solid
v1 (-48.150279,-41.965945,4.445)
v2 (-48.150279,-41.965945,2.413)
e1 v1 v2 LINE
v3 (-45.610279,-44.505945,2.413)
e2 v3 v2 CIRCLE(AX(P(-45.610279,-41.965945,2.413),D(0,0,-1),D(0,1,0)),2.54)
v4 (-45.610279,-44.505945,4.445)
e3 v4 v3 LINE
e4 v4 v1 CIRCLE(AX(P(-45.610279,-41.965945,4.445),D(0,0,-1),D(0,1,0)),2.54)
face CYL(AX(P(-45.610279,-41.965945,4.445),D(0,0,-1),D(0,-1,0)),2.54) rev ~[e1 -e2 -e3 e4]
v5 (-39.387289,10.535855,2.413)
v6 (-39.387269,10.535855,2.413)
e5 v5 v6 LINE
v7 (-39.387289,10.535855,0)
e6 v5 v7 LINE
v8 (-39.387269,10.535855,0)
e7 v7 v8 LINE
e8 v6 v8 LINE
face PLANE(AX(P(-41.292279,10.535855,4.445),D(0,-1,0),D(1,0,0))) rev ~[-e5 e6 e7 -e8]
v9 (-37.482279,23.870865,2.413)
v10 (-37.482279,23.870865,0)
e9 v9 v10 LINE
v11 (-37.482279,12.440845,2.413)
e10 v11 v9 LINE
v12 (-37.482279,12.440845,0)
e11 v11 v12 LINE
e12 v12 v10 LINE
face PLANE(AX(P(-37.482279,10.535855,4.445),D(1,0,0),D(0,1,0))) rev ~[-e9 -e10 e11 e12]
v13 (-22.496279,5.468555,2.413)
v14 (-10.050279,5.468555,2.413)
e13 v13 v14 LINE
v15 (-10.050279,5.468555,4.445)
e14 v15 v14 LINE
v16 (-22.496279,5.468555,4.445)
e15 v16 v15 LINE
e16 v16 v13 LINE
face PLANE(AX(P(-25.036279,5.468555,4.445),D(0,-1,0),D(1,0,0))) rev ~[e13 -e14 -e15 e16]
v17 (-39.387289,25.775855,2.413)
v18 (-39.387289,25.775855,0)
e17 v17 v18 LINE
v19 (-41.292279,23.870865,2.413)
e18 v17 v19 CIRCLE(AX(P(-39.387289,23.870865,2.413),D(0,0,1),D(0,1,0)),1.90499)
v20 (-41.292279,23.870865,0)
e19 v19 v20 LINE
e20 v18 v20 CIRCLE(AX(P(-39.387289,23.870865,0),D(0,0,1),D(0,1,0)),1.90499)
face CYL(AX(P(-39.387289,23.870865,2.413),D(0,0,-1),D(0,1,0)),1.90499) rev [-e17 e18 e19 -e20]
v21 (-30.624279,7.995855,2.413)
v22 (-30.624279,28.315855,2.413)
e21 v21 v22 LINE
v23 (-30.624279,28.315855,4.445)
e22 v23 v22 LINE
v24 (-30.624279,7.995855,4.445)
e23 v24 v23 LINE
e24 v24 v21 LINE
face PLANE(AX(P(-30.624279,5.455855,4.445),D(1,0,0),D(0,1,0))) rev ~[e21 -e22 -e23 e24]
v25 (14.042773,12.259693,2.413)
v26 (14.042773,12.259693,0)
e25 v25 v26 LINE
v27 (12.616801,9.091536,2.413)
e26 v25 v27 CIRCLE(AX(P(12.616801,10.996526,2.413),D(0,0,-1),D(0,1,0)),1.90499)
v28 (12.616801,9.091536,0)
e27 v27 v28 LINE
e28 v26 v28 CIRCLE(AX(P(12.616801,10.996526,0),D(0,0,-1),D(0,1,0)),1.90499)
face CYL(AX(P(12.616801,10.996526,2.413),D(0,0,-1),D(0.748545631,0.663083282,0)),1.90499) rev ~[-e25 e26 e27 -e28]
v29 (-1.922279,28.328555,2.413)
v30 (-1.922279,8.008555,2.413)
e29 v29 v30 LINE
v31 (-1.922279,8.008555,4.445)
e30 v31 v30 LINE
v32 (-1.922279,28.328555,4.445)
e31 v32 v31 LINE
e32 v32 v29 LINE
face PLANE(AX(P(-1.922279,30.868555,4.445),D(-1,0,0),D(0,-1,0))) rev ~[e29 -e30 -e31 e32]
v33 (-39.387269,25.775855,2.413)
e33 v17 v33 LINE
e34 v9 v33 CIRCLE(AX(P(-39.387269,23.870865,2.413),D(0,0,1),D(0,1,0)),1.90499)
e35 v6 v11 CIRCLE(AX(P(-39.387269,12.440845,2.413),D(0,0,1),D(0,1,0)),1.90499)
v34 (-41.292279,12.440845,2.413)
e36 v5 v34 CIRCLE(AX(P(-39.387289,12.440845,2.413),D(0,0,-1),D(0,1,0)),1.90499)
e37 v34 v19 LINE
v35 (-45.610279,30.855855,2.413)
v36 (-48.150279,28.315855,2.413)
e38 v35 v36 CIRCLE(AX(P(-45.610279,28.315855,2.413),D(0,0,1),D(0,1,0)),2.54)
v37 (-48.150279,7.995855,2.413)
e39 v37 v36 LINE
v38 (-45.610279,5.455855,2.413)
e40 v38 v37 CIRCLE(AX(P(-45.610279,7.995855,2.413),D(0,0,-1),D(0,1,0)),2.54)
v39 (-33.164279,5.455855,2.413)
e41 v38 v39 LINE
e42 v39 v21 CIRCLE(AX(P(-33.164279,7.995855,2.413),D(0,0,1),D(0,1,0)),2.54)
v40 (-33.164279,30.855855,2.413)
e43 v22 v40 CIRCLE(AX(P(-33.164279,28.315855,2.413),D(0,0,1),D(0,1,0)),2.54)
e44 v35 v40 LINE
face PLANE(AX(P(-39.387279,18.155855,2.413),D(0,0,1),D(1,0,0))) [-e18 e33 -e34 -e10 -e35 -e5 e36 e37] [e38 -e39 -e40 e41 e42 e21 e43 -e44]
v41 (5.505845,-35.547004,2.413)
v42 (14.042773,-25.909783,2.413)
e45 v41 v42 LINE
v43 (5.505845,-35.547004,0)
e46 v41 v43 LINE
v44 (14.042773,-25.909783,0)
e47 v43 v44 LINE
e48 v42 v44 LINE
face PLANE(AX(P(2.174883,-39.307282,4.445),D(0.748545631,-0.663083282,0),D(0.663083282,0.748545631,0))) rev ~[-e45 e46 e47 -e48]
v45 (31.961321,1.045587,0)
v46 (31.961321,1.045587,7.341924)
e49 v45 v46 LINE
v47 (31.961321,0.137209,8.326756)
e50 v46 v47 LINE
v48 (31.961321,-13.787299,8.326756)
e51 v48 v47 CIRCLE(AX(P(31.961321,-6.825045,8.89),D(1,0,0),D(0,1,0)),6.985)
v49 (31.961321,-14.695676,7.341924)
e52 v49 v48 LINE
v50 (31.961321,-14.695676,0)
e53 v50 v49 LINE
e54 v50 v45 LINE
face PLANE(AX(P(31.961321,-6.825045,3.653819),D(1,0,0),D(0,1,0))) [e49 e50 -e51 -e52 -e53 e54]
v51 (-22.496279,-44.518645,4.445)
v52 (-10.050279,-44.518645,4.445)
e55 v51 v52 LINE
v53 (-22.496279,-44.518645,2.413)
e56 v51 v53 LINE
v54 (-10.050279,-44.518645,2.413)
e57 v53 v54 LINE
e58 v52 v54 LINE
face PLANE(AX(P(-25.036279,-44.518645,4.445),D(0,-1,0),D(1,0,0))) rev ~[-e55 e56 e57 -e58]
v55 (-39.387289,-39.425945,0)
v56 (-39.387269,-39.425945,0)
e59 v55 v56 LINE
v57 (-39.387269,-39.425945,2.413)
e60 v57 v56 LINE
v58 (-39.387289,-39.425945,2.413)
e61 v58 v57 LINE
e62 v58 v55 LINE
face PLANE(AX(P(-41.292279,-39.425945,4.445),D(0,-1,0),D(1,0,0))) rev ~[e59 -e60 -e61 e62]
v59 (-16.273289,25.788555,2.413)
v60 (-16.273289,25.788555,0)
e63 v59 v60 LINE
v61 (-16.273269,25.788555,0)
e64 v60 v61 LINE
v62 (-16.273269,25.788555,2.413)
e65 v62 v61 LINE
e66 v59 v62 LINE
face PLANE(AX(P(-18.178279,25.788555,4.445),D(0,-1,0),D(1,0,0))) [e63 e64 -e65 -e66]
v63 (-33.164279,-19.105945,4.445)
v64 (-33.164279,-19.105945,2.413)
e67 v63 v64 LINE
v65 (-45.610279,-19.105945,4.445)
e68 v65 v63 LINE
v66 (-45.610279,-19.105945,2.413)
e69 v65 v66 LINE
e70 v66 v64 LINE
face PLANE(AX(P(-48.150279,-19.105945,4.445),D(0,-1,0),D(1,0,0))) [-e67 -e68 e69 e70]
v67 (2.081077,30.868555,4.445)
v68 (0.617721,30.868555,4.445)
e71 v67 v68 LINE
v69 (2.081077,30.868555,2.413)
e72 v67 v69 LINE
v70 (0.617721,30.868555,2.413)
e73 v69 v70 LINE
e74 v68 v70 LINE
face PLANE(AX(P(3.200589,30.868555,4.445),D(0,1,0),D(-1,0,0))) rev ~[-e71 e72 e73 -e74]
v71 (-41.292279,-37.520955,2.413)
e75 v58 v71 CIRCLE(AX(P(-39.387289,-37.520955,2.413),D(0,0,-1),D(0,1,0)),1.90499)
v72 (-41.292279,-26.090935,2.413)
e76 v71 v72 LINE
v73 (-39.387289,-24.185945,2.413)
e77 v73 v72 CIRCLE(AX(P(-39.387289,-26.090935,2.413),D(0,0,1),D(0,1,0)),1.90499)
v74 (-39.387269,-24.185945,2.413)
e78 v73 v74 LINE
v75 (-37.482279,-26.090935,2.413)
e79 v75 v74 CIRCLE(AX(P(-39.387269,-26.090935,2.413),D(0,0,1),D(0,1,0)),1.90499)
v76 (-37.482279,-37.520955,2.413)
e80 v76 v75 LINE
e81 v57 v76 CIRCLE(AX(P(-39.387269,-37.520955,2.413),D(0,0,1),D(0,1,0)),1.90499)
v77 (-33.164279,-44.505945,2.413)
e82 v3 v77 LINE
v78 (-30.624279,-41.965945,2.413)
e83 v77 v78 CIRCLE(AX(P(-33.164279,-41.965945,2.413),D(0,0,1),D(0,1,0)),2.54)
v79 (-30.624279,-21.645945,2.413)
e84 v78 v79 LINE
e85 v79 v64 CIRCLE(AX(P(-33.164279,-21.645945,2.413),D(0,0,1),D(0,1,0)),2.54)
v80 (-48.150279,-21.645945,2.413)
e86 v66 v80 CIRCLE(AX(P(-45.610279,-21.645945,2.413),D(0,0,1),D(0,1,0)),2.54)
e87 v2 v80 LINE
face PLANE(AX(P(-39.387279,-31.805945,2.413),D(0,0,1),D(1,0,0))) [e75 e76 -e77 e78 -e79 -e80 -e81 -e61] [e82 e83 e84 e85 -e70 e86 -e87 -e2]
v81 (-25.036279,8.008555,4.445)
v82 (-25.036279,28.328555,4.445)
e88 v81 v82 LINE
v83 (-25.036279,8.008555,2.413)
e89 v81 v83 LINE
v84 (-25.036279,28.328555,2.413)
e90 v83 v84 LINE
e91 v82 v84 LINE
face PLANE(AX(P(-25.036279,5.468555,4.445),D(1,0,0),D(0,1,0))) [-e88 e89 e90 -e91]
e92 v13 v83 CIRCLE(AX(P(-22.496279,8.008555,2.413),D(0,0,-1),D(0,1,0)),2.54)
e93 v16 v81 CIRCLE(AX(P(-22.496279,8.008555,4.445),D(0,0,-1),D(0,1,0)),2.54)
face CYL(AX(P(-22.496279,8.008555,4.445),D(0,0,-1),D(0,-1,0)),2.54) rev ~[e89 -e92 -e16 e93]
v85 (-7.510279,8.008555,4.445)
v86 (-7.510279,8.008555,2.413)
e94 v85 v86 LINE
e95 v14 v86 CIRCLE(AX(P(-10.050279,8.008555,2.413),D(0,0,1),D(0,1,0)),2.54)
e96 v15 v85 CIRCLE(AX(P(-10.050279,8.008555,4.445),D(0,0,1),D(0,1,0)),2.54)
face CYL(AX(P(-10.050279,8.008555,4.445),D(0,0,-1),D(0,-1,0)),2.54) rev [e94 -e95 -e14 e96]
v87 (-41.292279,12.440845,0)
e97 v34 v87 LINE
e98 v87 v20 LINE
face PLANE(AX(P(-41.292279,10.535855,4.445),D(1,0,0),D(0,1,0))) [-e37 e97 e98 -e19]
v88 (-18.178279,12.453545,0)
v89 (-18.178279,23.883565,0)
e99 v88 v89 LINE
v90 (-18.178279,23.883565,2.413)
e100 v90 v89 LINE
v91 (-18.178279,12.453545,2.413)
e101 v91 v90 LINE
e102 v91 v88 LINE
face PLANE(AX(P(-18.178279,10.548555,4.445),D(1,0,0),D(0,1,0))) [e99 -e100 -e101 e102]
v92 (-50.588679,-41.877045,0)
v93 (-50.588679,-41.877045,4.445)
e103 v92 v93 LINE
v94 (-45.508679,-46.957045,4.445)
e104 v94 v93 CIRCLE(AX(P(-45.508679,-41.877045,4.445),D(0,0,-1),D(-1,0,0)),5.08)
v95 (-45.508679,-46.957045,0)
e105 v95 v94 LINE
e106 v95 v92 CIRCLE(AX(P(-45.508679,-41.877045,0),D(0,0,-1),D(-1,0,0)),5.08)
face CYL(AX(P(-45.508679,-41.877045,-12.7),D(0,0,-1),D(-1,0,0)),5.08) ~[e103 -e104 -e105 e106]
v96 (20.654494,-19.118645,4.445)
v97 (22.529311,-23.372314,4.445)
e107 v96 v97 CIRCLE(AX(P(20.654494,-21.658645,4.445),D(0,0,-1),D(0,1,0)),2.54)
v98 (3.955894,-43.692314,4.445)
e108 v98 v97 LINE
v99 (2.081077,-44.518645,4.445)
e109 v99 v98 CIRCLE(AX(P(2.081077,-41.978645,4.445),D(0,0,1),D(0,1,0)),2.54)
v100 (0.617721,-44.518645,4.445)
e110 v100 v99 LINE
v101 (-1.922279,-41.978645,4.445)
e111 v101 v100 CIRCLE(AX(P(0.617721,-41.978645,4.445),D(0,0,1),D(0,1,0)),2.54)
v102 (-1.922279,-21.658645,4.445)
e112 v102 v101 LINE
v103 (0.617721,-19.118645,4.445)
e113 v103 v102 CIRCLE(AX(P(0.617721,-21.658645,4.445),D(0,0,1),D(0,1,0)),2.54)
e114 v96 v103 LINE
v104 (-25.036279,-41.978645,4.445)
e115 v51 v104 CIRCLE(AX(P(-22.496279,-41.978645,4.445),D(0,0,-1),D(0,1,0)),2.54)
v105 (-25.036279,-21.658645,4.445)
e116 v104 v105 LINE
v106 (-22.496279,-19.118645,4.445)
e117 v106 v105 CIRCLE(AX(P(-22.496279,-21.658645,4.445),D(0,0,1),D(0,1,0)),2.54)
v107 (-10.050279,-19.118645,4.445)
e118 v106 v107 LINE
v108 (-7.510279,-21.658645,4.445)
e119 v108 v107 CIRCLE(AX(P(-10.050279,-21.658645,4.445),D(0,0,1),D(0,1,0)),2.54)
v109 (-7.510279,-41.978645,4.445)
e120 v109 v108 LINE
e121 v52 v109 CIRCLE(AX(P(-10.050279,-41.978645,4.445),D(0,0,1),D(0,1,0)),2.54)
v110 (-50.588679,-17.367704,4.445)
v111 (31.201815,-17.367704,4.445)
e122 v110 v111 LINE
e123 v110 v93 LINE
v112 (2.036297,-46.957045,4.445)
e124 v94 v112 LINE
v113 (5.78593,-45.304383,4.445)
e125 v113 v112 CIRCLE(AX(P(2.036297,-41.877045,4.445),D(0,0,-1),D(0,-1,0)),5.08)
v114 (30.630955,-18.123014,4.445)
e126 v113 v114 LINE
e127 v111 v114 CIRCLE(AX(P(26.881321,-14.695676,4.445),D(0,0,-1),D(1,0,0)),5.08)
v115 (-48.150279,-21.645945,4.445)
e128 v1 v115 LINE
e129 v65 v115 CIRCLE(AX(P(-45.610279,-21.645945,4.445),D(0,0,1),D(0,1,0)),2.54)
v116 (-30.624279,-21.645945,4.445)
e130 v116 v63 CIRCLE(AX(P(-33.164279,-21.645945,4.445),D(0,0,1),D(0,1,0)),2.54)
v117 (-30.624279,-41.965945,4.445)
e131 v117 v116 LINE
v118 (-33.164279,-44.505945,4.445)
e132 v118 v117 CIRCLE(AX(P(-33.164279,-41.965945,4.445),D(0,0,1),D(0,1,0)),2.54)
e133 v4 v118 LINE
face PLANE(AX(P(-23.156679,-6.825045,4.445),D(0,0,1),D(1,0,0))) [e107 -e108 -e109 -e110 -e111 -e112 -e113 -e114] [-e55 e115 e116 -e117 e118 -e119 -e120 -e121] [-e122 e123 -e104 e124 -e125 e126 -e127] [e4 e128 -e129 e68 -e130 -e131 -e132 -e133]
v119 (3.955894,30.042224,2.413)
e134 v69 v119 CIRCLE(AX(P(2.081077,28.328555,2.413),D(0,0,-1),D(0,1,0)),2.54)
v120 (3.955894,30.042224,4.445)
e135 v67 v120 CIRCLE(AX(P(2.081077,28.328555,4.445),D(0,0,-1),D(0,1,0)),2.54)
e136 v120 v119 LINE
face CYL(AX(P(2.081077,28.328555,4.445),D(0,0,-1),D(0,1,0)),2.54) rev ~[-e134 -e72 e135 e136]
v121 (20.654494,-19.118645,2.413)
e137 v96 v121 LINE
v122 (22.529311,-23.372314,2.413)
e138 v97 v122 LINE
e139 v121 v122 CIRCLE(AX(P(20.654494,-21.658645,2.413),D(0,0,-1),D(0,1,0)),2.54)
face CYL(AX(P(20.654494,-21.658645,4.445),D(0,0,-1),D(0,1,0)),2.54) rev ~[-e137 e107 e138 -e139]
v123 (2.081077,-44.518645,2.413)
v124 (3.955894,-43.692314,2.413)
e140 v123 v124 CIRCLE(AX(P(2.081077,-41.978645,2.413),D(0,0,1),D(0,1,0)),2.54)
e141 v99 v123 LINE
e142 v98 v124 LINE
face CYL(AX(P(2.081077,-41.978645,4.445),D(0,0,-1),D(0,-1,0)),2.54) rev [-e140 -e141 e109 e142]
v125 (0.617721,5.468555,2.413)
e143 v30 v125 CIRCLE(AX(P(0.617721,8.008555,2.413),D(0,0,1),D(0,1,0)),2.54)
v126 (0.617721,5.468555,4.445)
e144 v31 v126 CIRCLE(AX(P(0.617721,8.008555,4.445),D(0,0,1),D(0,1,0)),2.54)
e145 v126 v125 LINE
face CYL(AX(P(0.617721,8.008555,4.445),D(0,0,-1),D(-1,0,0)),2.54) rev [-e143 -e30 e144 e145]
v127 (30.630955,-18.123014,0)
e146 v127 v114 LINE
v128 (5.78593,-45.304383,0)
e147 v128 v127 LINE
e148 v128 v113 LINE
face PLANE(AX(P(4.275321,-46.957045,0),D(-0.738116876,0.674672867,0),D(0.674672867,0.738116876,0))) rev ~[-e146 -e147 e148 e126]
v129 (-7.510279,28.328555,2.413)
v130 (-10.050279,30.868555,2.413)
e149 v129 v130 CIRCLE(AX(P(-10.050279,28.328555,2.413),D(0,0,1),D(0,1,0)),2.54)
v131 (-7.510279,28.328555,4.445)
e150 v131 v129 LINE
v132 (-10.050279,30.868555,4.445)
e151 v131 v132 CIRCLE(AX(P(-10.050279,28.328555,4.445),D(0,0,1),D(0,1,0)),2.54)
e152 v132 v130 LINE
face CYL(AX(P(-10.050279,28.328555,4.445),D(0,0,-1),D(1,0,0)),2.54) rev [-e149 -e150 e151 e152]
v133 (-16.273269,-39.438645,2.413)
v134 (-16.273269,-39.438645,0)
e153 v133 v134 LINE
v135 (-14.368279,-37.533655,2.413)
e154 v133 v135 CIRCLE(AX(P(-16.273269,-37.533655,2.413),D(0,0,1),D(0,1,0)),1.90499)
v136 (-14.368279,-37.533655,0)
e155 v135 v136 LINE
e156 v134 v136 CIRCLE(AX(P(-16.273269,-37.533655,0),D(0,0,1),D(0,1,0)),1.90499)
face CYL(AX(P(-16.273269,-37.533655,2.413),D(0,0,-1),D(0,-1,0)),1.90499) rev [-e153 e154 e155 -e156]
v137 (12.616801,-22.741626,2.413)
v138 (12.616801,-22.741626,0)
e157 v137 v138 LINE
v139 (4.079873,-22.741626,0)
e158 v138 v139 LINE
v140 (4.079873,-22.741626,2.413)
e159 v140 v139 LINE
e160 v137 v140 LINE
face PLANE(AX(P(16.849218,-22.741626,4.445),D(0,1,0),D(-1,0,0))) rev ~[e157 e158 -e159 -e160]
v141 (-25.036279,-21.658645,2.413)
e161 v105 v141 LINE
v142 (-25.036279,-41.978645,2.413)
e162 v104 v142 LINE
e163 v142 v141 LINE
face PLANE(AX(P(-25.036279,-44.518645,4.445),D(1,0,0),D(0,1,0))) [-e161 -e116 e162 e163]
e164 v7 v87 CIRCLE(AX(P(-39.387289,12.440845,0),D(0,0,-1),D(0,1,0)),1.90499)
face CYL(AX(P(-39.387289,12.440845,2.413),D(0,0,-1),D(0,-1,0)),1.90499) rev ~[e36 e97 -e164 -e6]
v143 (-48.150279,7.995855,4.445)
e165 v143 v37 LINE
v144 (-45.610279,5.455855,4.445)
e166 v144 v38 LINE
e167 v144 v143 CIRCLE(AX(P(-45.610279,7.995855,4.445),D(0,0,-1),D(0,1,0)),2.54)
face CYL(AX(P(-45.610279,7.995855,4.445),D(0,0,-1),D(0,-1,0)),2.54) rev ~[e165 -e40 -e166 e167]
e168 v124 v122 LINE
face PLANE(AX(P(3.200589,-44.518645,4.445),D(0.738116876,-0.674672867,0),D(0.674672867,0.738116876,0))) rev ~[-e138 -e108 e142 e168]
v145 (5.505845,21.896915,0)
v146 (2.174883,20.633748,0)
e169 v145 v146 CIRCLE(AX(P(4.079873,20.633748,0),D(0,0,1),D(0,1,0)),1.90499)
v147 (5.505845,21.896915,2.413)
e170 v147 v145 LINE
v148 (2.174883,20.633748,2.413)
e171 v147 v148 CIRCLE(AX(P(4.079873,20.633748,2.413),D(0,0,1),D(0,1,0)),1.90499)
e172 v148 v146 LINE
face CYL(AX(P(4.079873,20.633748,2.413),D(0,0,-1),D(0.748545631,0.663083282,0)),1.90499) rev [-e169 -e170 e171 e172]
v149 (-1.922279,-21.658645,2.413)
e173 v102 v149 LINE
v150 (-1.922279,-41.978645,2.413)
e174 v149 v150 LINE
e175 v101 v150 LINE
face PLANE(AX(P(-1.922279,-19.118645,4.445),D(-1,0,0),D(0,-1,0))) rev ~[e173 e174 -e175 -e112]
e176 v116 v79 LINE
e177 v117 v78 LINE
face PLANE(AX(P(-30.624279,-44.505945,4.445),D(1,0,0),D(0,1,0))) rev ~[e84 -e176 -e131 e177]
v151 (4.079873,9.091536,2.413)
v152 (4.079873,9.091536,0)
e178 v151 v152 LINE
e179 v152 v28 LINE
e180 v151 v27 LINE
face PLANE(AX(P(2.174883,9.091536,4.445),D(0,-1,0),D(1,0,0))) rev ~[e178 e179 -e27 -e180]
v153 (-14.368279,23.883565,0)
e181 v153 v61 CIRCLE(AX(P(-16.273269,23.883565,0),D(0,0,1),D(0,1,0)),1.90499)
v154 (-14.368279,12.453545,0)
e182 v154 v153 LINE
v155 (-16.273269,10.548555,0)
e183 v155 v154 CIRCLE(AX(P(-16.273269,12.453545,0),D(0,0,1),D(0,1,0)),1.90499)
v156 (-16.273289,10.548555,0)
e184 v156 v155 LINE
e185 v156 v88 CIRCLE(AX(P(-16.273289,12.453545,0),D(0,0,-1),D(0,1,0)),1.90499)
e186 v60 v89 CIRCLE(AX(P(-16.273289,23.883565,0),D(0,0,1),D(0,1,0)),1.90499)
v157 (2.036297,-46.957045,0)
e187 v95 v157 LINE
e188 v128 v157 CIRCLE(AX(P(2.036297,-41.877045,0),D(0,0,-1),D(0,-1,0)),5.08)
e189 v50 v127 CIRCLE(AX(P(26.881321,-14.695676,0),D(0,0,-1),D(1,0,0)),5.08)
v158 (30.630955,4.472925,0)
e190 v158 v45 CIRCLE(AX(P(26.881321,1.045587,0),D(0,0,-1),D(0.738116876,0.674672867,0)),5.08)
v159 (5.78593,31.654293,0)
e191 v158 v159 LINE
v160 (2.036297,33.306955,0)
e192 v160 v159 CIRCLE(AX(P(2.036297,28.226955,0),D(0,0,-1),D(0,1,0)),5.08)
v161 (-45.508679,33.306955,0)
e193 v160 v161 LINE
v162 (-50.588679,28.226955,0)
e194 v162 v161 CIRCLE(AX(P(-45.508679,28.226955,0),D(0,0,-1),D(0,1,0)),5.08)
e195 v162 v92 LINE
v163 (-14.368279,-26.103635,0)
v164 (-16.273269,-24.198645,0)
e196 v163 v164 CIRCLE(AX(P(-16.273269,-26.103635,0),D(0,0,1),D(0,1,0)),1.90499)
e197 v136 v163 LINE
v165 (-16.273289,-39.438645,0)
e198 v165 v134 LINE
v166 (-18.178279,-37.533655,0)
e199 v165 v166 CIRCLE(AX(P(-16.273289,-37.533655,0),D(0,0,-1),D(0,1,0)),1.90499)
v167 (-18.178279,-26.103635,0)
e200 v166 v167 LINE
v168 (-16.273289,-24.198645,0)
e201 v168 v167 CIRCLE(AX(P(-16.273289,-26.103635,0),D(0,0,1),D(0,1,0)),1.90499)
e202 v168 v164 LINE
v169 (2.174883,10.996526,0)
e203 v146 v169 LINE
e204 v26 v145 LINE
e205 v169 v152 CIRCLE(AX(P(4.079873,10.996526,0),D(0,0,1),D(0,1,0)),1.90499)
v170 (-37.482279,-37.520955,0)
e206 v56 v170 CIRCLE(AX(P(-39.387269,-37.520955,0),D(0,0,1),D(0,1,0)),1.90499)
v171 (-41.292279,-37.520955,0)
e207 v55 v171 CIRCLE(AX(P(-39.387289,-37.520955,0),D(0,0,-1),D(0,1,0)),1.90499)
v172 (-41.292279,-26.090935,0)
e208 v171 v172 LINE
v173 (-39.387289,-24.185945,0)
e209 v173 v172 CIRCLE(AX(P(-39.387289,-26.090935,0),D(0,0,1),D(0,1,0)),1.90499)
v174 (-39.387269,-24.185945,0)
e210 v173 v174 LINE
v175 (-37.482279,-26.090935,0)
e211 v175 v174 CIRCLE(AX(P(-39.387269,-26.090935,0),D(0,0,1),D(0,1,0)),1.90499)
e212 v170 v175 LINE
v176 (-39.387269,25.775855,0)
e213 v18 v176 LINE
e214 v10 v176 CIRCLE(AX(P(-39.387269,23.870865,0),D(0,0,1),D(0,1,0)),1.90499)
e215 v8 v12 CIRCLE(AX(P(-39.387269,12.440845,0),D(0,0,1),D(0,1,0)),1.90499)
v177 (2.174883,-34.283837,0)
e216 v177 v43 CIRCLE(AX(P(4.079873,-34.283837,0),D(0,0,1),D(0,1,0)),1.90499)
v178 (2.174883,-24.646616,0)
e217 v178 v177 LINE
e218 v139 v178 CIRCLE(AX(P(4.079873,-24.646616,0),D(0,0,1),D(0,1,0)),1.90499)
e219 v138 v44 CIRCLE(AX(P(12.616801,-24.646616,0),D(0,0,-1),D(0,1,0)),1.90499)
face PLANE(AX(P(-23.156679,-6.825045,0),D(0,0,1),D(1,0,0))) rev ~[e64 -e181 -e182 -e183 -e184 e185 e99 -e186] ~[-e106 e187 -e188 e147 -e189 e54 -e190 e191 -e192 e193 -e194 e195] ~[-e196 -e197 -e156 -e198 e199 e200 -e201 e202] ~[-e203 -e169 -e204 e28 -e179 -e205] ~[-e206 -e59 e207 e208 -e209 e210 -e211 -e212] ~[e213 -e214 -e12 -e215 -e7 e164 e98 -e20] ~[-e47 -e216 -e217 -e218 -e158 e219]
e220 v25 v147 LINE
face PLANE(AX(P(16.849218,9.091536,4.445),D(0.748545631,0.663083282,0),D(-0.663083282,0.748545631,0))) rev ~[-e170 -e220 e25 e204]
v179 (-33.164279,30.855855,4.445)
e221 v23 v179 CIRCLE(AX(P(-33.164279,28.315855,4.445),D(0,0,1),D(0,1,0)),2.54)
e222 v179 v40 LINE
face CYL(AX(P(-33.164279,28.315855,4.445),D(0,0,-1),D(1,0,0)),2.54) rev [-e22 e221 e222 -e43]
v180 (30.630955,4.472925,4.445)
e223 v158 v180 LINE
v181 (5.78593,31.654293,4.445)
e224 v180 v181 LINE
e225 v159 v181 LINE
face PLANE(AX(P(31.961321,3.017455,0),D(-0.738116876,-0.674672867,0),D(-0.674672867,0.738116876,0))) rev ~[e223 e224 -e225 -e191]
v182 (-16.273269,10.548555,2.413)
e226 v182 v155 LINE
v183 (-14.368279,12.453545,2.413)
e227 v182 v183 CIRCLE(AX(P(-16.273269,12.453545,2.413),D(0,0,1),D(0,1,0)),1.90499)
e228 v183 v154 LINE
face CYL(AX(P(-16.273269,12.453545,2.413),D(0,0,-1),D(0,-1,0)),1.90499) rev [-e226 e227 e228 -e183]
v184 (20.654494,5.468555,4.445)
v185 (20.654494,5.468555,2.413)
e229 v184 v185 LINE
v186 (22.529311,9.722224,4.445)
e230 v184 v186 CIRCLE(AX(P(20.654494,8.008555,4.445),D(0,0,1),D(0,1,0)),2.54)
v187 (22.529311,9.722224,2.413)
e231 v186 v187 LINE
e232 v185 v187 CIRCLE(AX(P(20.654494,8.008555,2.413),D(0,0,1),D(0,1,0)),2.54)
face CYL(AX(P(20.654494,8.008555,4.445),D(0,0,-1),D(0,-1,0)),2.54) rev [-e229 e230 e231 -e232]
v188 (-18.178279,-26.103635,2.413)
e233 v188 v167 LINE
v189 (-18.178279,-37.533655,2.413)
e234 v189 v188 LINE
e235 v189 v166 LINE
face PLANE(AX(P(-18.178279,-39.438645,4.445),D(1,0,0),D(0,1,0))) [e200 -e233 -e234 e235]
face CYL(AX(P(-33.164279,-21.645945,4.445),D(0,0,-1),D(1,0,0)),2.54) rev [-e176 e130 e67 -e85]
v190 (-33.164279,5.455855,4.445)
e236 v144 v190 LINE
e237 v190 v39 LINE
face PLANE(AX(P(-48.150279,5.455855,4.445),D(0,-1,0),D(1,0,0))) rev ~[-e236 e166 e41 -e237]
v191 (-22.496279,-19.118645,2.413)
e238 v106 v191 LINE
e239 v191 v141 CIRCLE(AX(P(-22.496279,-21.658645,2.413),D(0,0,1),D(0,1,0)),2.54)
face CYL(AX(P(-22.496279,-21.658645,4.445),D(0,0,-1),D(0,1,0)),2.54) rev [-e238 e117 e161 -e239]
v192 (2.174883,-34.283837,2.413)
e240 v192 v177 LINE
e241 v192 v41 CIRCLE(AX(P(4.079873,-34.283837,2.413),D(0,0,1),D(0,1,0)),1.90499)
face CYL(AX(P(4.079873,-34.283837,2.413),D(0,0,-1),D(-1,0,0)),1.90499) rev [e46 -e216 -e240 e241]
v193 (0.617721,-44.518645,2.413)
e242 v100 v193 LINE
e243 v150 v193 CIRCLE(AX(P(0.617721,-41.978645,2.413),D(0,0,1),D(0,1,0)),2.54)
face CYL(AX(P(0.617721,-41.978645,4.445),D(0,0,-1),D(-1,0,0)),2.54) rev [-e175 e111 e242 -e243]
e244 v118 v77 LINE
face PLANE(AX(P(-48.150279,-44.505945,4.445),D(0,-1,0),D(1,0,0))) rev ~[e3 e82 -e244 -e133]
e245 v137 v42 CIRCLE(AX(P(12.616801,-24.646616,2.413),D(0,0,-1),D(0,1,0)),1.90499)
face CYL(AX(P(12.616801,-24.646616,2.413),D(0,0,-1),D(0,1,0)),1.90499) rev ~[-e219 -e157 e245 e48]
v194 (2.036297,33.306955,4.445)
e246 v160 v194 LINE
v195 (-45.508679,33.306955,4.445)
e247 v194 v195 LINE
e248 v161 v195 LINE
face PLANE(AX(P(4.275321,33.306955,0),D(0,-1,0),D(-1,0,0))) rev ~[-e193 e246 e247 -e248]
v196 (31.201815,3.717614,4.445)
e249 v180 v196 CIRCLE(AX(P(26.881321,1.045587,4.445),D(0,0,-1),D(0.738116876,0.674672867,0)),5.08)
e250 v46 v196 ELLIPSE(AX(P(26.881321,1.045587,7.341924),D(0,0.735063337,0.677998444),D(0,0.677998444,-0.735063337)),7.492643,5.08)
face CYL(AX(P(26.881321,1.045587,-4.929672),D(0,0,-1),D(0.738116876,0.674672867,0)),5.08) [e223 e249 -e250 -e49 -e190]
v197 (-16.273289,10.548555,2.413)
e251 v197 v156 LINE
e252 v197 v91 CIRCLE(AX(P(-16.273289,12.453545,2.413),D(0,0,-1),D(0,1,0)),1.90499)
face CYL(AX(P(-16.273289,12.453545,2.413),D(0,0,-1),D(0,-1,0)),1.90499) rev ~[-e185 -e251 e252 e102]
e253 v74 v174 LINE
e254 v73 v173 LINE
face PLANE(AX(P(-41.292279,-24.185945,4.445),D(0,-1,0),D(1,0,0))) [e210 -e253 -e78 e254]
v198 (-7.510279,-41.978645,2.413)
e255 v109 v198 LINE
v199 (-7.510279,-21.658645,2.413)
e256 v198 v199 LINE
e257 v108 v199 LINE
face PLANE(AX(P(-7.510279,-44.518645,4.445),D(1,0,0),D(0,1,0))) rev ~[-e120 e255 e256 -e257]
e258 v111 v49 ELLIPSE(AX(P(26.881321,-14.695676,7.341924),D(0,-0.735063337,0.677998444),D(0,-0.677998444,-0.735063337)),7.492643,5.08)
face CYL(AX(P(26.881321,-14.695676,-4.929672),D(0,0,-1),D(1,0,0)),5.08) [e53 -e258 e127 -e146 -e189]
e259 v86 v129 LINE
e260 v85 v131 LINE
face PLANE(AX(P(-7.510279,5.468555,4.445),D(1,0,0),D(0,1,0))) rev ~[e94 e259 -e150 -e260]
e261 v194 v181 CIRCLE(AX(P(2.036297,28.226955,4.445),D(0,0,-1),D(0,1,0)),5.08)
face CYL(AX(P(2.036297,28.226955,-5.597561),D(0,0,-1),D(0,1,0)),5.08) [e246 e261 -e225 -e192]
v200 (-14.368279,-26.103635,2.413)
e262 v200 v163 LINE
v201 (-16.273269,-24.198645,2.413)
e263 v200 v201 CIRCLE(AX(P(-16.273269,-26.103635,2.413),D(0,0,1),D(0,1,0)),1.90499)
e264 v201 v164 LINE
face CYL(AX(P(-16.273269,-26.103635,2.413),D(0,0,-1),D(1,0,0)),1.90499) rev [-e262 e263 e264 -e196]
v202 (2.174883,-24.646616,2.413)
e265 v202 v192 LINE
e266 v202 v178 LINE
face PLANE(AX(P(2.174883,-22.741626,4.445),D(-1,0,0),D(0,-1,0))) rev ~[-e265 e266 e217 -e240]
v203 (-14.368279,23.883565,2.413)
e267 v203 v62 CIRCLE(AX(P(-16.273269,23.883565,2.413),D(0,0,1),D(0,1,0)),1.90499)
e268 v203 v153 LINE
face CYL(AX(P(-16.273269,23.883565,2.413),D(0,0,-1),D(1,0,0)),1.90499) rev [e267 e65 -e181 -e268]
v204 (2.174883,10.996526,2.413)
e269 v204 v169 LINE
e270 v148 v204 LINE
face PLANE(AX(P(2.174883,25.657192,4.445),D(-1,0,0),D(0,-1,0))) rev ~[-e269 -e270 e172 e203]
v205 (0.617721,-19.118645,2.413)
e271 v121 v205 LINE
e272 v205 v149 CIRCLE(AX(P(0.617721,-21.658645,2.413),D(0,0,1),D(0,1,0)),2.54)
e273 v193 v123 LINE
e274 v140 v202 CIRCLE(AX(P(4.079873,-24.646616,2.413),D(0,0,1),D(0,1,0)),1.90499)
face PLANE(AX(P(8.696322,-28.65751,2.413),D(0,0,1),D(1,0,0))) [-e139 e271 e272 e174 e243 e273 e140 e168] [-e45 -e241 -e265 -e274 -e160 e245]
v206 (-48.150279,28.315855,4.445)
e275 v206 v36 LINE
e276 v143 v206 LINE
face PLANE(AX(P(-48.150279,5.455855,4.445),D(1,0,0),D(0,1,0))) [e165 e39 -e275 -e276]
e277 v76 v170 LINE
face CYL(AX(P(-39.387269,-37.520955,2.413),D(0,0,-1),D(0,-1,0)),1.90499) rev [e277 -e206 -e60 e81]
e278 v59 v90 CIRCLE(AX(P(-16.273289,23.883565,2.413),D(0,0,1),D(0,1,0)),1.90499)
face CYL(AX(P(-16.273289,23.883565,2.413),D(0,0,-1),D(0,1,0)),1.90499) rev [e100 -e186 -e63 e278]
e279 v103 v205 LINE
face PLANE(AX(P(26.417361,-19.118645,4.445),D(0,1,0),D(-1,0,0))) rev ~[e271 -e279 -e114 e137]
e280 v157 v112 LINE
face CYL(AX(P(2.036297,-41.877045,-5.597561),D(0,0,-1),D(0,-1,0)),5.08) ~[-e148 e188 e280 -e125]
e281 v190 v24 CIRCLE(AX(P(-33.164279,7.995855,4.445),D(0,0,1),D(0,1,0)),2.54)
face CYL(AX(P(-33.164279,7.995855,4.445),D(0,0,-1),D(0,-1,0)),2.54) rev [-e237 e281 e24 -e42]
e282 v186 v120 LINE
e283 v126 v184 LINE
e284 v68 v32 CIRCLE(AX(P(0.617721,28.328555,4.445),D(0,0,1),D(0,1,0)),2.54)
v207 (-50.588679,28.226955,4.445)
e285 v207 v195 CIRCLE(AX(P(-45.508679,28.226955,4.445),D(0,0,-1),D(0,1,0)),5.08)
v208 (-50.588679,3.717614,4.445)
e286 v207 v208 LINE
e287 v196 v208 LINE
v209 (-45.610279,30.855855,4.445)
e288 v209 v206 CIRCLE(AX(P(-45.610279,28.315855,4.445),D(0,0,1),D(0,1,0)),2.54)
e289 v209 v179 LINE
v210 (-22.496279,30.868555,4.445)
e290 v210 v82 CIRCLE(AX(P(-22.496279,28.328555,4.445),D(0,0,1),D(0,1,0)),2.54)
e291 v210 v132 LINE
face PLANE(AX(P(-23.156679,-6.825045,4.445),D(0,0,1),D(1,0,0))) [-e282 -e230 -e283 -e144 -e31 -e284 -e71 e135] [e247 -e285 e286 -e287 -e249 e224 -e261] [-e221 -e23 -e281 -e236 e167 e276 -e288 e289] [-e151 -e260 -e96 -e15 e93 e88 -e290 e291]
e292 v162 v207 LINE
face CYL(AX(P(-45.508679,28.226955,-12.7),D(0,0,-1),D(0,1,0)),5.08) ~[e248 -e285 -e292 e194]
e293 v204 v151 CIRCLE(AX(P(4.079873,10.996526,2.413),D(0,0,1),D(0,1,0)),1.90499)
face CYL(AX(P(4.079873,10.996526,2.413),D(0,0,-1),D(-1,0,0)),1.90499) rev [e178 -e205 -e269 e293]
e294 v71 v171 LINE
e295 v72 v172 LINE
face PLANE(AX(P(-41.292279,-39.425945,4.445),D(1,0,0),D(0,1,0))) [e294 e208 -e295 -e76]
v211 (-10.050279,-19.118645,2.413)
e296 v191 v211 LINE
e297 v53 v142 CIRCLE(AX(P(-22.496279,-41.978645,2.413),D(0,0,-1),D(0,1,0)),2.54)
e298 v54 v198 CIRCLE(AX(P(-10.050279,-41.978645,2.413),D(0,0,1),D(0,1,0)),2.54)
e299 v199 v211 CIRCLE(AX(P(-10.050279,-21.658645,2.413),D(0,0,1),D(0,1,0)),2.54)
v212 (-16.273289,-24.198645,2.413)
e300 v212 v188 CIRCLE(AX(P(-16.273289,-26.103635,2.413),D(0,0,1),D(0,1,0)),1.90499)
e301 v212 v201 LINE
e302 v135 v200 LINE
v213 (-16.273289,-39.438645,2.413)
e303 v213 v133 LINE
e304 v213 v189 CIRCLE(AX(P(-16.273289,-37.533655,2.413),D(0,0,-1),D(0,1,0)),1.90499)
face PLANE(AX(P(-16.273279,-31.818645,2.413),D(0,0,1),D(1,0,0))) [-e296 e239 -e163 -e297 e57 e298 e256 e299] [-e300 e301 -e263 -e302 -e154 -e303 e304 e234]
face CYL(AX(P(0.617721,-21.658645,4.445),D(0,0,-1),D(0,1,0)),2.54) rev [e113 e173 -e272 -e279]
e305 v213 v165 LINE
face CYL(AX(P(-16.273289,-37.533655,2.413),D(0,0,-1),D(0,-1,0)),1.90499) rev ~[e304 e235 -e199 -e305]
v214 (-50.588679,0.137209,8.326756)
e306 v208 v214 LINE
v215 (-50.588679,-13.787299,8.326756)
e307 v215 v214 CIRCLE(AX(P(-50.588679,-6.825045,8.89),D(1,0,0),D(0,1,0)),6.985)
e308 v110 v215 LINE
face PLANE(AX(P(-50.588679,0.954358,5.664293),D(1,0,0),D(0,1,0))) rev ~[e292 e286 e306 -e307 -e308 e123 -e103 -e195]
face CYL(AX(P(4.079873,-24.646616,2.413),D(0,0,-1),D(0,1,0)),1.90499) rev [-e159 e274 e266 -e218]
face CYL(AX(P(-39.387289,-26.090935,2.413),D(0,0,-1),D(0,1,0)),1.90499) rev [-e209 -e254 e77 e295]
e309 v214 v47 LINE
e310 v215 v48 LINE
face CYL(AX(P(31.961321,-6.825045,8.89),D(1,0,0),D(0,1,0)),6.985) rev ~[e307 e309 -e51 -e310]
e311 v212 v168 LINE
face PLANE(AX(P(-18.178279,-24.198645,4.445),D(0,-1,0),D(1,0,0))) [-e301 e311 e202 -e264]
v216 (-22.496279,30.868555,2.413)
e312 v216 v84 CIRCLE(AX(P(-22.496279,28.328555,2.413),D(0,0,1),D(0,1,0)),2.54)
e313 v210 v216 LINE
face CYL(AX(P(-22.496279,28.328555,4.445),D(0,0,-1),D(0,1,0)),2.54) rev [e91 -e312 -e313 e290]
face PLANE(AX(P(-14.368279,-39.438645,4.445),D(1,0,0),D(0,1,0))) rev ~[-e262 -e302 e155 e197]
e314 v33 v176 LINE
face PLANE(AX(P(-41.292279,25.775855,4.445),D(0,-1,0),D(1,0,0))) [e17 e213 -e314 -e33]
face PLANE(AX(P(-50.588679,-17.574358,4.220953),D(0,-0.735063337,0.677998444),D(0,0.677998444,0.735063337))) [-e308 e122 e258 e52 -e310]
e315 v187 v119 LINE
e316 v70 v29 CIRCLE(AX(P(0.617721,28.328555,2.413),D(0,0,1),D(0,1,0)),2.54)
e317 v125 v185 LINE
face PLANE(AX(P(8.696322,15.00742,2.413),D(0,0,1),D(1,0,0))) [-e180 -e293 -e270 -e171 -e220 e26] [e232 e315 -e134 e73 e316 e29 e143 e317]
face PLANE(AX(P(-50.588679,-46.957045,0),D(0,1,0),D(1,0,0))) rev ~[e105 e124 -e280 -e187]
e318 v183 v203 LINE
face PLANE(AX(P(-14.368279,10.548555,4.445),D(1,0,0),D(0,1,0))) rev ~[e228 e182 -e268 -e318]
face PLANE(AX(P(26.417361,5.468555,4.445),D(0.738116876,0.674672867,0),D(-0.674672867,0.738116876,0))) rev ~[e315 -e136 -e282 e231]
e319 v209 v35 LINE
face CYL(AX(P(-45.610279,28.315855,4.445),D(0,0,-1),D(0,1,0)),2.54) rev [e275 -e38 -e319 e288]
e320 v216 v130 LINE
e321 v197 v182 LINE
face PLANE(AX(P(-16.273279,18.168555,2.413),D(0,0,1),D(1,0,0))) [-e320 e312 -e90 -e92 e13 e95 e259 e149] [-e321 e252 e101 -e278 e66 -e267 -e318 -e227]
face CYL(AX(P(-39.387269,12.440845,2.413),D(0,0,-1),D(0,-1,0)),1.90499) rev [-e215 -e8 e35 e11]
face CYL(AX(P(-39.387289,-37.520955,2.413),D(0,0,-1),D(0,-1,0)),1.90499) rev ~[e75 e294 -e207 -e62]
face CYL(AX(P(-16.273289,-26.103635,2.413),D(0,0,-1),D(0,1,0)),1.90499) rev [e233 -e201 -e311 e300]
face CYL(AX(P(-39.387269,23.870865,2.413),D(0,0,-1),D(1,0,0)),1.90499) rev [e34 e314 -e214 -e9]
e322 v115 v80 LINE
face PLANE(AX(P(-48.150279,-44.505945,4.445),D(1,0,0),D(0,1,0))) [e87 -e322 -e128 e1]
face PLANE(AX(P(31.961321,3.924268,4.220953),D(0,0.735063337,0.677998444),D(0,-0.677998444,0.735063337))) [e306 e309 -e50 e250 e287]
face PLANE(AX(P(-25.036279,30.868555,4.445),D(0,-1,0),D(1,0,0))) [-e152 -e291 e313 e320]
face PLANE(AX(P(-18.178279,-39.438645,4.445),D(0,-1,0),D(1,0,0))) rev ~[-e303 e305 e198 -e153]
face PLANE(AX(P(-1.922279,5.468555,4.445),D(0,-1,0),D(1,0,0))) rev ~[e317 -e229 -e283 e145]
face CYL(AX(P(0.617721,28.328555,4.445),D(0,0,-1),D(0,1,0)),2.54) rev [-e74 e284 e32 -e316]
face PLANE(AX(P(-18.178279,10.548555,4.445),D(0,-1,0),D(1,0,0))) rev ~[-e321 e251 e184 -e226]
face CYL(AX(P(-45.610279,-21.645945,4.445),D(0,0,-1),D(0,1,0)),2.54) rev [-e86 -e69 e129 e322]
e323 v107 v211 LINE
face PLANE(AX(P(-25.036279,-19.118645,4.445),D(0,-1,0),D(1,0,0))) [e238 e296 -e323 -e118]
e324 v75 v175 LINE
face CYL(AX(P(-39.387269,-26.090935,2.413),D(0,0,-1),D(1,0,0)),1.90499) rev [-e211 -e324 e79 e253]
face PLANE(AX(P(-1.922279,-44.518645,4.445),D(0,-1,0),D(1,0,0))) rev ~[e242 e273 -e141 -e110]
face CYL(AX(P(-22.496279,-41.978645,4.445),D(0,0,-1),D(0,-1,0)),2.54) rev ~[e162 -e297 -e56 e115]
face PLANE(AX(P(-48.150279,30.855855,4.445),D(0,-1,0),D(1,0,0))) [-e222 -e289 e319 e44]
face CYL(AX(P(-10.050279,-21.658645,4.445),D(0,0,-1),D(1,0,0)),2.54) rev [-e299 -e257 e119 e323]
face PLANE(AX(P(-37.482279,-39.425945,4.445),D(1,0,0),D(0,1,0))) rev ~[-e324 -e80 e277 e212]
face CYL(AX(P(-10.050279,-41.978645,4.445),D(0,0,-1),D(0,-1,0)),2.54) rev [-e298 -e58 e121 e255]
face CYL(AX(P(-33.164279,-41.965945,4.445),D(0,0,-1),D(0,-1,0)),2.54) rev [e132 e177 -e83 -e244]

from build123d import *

# Parameters (mm, degrees)
F0_W         = 27.686
F0_H         = 19.685
F1_DEPTH     = 4.445
F4_DEPTH     = 82.55
F5_T4_DEPTH  = 82.55
F5_T9_DEPTH  = 82.55
F3_R         = 6.985
F6_DEPTH     = 101.6
F7_W         = 17.526
F7_H         = 25.4
F8_DEPTH     = 2.032
F9_R         = 2.54
F10_W        = 3.81
F10_H        = 15.24
F11_DEPTH    = 25.4
F12_R        = 1.90499
F13_T1_DEPTH = 29.845
F13_T3_DEPTH = 15.6401229428
F13_T5_DEPTH = 15.0634324568


# Not quite as in the source:
# - a fillet or chamfer that OpenCascade refuses, or shapes differently, is made with other operations: its cross-section is extruded or revolved along the edge and cut away or added
# - a fillet or chamfer is up to 0.001 mm smaller than in the source, because OpenCascade refuses the exact size


with BuildPart() as f1:
    # F0 (on Top) → F1 (new body)
    with BuildSketch(Plane.XY):
        Polygon((4.2753211141, 33.3069552488), (-50.5886788859, 33.3069552488), (-50.5886788859, -46.9570447512), (4.2753211141, -46.9570447512), (4.2753211141, -16.6675447512), (4.2753211141, 3.0174552488), align=None)
        Polygon((31.9613211141, 3.0174552488), (4.2753211141, 33.3069552488), (4.2753211141, 3.0174552488), align=None)
        with Locations((18.1183211141, -6.8250447512)):
            Rectangle(F0_W, F0_H)
        Polygon((4.2753211141, -16.6675447512), (4.2753211141, -46.9570447512), (31.9613211141, -16.6675447512), align=None)
    extrude(amount=F1_DEPTH)

    # F3 (on face) → F4 (join)
    with BuildSketch(Plane.YZ.offset(31.9613211141)):
        with BuildLine():
            Line((-1.4368910785, 4.445), (-12.2131984238, 4.445))
            ThreePointArc((-12.2131984238, 4.445), (-6.8250447512, 1.905), (-1.4368910785, 4.445))
        make_face()
        with BuildLine():
            ThreePointArc((-1.4368910785, 4.445), (-0.2513669981, 6.5284357306), (0.1599552488, 8.89))
            ThreePointArc((0.1599552488, 8.89), (-9.1866090205, 15.4636777531), (-12.2131984238, 4.445))
            Line((-12.2131984238, 4.445), (-1.4368910785, 4.445))
        make_face()
    extrude(amount=-F4_DEPTH)

    # F5: chamfer of 7.62 on 2 edges, made by hand


with BuildPart() as f5_tool2:
    # F5_s3 → F5_t4 (new body)
    with BuildSketch(Plane.YZ.offset(31.9613211141)):
        with BuildLine():
            Line((3.9242683255, 4.2209526948), (-0.0694446449, 8.550803314))
            Line((-0.0694446449, 8.550803314), (-0.2213483693, 8.5630922738))
            ThreePointArc((-0.2213483693, 8.5630922738), (-0.4679887951, 6.3855514916), (-1.554450795, 4.5419818182))
            Line((-1.554450795, 4.5419818182), (-1.4368910785, 4.2926))
            ThreePointArc((-1.4368910785, 4.2926), (1.2436886235, 4.2926), (3.9242683255, 4.0685526948))
            Line((3.9242683255, 4.0685526948), (3.9242683255, 4.2209526948))
        make_face()
    extrude(amount=-F5_T4_DEPTH)

    split(bisect_by=Plane(origin=(18.9157105891, 17.2898319012, 0), x_dir=(0, 0, 1), z_dir=(-0.7381168756, -0.6746728674, 0)), keep=Keep.TOP)


with BuildPart() as f1_1:
    add(f1.part)

    # F5_t1: union F5_tool2
    add(f5_tool2.part)


with BuildPart() as f5_tool7:
    # F5_s8 → F5_t9 (new body)
    with BuildSketch(Plane.YZ.offset(-50.5886788859)):
        with BuildLine():
            Line((-17.5743578278, 4.2209526948), (-13.5806448574, 8.550803314))
            Line((-13.5806448574, 8.550803314), (-13.4287411331, 8.5630922738))
            ThreePointArc((-13.4287411331, 8.5630922738), (-13.1821007073, 6.3855514916), (-12.0956387073, 4.5419818182))
            Line((-12.0956387073, 4.5419818182), (-12.2131984238, 4.2926))
            ThreePointArc((-12.2131984238, 4.2926), (-14.8937781258, 4.2926), (-17.5743578278, 4.0685526948))
            Line((-17.5743578278, 4.0685526948), (-17.5743578278, 4.2209526948))
        make_face()
    extrude(amount=F5_T9_DEPTH)

    split(bisect_by=Plane(origin=(25.7132835648, -23.5031271159, 0), x_dir=(0, 0, 1), z_dir=(-0.7381168756, 0.6746728674, 0)), keep=Keep.TOP)


with BuildPart() as f1_2:
    add(f1_1.part)

    # F5_t6: union F5_tool7
    add(f5_tool7.part)

    # F3 (on face) → F6 (cut)
    with BuildSketch(Plane.YZ.offset(31.9613211141)):
        with Locations((-6.8250447512, 8.89)):
            Circle(F3_R)
    extrude(amount=-F6_DEPTH, mode=Mode.SUBTRACT)

    # F7 (on face) → F8 (cut)
    with BuildSketch(Plane.XY.offset(4.445)):
        with Locations((-39.3872788859, -31.8059447512)):
            Rectangle(F7_W, F7_H)
        with Locations((-16.2732788859, -31.8186447512)):
            Rectangle(F7_W, F7_H)
        Polygon((26.4173608001, -19.1186447512), (-1.9222788859, -19.1186447512), (-1.9222788859, -44.5186447512), (3.2005893116, -44.5186447512), align=None)
        Polygon((3.2005893116, 30.8685552488), (-1.9222788859, 30.8685552488), (-1.9222788859, 5.4685552488), (26.4173608001, 5.4685552488), align=None)
        with Locations((-39.3872788859, 18.1558552488)):
            Rectangle(F7_W, F7_H)
        with Locations((-16.2732788859, 18.1685552488)):
            Rectangle(F7_W, F7_H)
    extrude(amount=-F8_DEPTH, mode=Mode.SUBTRACT)

    # F9
    f9_edges = [f1_2.edges().sort_by_distance(p)[0] for p in [
        (-48.150279, -19.105945, 3.429),
        (-48.150279, 30.855855, 3.429),
        (-25.036279, 30.868555, 3.429),
        (-1.922279, 30.868555, 3.429),
        (3.200589, 30.868555, 3.429),
        (-1.922279, -19.118645, 3.429),
        (-25.036279, -19.118645, 3.429),
        (-30.624279, 30.855855, 3.429),
        (-7.510279, 30.868555, 3.429),
        (26.417361, -19.118645, 3.429),
        (-7.510279, -19.118645, 3.429),
        (-30.624279, -19.105945, 3.429),
        (3.200589, -44.518645, 3.429),
        (-7.510279, -44.518645, 3.429),
        (-30.624279, -44.505945, 3.429),
        (-7.510279, 5.468555, 3.429),
        (-30.624279, 5.455855, 3.429),
        (-48.150279, 5.455855, 3.429),
        (-48.150279, -44.505945, 3.429),
        (-25.036279, -44.518645, 3.429),
        (-1.922279, -44.518645, 3.429),
        (-1.922279, 5.468555, 3.429),
        (-25.036279, 5.468555, 3.429),
        (26.417361, 5.468555, 3.429),
    ]]
    fillet(f9_edges, radius=F9_R)

    # F10 (on face) → F11 (cut)
    with BuildSketch(Plane.XY.offset(4.445)):
        with Locations((-39.3872788859, -31.8059447512)):
            Rectangle(F10_W, F10_H)
        with Locations((-16.2732788859, -31.8186447512)):
            Rectangle(F10_W, F10_H)
        Polygon((16.8492179688, -22.7416258461), (2.1748828364, -22.7416258461), (2.1748828364, -39.307281707), align=None)
        Polygon((16.8492179688, 9.0915363437), (2.1748828364, 25.6571922047), (2.1748828364, 9.0915363437), align=None)
        with Locations((-16.2732788859, 18.1685552488)):
            Rectangle(F10_W, F10_H)
        with Locations((-39.3872788859, 18.1558552488)):
            Rectangle(F10_W, F10_H)
    extrude(amount=-F11_DEPTH, mode=Mode.SUBTRACT)

    # F12 (radius 1.905 in the source; OpenCascade refuses exactly that, so slightly less here)
    f12_edges = [f1_2.edges().sort_by_distance(p)[0] for p in [
        (-41.292279, -24.185945, 1.2065),
        (-37.482279, -24.185945, 1.2065),
        (-14.368279, -24.198645, 1.2065),
        (16.849218, -22.741626, 1.2065),
        (-14.368279, 25.788555, 1.2065),
        (-37.482279, 25.775855, 1.2065),
        (-18.178279, -24.198645, 1.2065),
        (2.174883, -22.741626, 1.2065),
        (-18.178279, 25.788555, 1.2065),
        (-41.292279, 25.775855, 1.2065),
        (2.174883, 25.657192, 1.2065),
        (-41.292279, -39.425945, 1.2065),
        (-18.178279, -39.438645, 1.2065),
        (-41.292279, 10.535855, 1.2065),
        (-18.178279, 10.548555, 1.2065),
        (2.174883, 9.091536, 1.2065),
        (-14.368279, -39.438645, 1.2065),
        (-37.482279, -39.425945, 1.2065),
        (-14.368279, 10.548555, 1.2065),
        (-37.482279, 10.535855, 1.2065),
        (16.849218, 9.091536, 1.2065),
        (2.174883, -39.307282, 1.2065),
    ]]
    fillet(f12_edges, radius=F12_R)

    # F13: fillet of radius 5.08 on 6 edges, made by hand

    # F13_s2 → F13_t1 (cut)
    with BuildSketch(Plane.XY.offset(-12.7)):
        with BuildLine():
            ThreePointArc((-50.5886788859, -41.8770447512), (-49.1007813343, -45.4691471996), (-45.5086788859, -46.9570447512))
            Line((-45.5086788859, -46.9570447512), (-50.5886788859, -46.9570447512))
            Line((-50.5886788859, -46.9570447512), (-50.5886788859, -41.8770447512))
        make_face()
        with BuildLine():
            ThreePointArc((-45.5086788859, 33.3069552488), (-49.1007813343, 31.8190576973), (-50.5886788859, 28.2269552488))
            Line((-50.5886788859, 28.2269552488), (-50.5886788859, 33.3069552488))
            Line((-50.5886788859, 33.3069552488), (-45.5086788859, 33.3069552488))
        make_face()
    extrude(amount=F13_T1_DEPTH, mode=Mode.SUBTRACT)

    # F13_s4 → F13_t3 (cut)
    with BuildSketch(Plane.XY.offset(-5.5975614714)):
        with BuildLine():
            ThreePointArc((2.0362965256, -46.9570447512), (4.0851403599, -46.5255540759), (5.7859302534, -45.3043829175))
            Line((5.7859302534, -45.3043829175), (4.2753211141, -46.9570447512))
            Line((4.2753211141, -46.9570447512), (2.0362965256, -46.9570447512))
        make_face()
        with BuildLine():
            ThreePointArc((2.0362965256, 33.3069552488), (4.0851403599, 32.8754645736), (5.7859302534, 31.6542934152))
            Line((5.7859302534, 31.6542934152), (4.2753211141, 33.3069552488))
            Line((4.2753211141, 33.3069552488), (2.0362965256, 33.3069552488))
        make_face()
    extrude(amount=F13_T3_DEPTH, mode=Mode.SUBTRACT)

    # F13_s6 → F13_t5 (cut)
    with BuildSketch(Plane.XY.offset(-4.9296716098)):
        with BuildLine():
            ThreePointArc((31.9613211141, -14.6956761073), (31.6170649489, -16.5339172044), (30.630954842, -18.1230142736))
            Line((30.630954842, -18.1230142736), (31.9613211141, -16.6675447512))
            Line((31.9613211141, -16.6675447512), (31.9613211141, -14.6956761073))
        make_face()
        with BuildLine():
            ThreePointArc((30.630954842, 4.4729247713), (31.6170649489, 2.8838277021), (31.9613211141, 1.0455866049))
            Line((31.9613211141, 1.0455866049), (31.9613211141, 3.0174552488))
            Line((31.9613211141, 3.0174552488), (30.630954842, 4.4729247713))
        make_face()
    extrude(amount=F13_T5_DEPTH, mode=Mode.SUBTRACT)


solid = f1_2.part
